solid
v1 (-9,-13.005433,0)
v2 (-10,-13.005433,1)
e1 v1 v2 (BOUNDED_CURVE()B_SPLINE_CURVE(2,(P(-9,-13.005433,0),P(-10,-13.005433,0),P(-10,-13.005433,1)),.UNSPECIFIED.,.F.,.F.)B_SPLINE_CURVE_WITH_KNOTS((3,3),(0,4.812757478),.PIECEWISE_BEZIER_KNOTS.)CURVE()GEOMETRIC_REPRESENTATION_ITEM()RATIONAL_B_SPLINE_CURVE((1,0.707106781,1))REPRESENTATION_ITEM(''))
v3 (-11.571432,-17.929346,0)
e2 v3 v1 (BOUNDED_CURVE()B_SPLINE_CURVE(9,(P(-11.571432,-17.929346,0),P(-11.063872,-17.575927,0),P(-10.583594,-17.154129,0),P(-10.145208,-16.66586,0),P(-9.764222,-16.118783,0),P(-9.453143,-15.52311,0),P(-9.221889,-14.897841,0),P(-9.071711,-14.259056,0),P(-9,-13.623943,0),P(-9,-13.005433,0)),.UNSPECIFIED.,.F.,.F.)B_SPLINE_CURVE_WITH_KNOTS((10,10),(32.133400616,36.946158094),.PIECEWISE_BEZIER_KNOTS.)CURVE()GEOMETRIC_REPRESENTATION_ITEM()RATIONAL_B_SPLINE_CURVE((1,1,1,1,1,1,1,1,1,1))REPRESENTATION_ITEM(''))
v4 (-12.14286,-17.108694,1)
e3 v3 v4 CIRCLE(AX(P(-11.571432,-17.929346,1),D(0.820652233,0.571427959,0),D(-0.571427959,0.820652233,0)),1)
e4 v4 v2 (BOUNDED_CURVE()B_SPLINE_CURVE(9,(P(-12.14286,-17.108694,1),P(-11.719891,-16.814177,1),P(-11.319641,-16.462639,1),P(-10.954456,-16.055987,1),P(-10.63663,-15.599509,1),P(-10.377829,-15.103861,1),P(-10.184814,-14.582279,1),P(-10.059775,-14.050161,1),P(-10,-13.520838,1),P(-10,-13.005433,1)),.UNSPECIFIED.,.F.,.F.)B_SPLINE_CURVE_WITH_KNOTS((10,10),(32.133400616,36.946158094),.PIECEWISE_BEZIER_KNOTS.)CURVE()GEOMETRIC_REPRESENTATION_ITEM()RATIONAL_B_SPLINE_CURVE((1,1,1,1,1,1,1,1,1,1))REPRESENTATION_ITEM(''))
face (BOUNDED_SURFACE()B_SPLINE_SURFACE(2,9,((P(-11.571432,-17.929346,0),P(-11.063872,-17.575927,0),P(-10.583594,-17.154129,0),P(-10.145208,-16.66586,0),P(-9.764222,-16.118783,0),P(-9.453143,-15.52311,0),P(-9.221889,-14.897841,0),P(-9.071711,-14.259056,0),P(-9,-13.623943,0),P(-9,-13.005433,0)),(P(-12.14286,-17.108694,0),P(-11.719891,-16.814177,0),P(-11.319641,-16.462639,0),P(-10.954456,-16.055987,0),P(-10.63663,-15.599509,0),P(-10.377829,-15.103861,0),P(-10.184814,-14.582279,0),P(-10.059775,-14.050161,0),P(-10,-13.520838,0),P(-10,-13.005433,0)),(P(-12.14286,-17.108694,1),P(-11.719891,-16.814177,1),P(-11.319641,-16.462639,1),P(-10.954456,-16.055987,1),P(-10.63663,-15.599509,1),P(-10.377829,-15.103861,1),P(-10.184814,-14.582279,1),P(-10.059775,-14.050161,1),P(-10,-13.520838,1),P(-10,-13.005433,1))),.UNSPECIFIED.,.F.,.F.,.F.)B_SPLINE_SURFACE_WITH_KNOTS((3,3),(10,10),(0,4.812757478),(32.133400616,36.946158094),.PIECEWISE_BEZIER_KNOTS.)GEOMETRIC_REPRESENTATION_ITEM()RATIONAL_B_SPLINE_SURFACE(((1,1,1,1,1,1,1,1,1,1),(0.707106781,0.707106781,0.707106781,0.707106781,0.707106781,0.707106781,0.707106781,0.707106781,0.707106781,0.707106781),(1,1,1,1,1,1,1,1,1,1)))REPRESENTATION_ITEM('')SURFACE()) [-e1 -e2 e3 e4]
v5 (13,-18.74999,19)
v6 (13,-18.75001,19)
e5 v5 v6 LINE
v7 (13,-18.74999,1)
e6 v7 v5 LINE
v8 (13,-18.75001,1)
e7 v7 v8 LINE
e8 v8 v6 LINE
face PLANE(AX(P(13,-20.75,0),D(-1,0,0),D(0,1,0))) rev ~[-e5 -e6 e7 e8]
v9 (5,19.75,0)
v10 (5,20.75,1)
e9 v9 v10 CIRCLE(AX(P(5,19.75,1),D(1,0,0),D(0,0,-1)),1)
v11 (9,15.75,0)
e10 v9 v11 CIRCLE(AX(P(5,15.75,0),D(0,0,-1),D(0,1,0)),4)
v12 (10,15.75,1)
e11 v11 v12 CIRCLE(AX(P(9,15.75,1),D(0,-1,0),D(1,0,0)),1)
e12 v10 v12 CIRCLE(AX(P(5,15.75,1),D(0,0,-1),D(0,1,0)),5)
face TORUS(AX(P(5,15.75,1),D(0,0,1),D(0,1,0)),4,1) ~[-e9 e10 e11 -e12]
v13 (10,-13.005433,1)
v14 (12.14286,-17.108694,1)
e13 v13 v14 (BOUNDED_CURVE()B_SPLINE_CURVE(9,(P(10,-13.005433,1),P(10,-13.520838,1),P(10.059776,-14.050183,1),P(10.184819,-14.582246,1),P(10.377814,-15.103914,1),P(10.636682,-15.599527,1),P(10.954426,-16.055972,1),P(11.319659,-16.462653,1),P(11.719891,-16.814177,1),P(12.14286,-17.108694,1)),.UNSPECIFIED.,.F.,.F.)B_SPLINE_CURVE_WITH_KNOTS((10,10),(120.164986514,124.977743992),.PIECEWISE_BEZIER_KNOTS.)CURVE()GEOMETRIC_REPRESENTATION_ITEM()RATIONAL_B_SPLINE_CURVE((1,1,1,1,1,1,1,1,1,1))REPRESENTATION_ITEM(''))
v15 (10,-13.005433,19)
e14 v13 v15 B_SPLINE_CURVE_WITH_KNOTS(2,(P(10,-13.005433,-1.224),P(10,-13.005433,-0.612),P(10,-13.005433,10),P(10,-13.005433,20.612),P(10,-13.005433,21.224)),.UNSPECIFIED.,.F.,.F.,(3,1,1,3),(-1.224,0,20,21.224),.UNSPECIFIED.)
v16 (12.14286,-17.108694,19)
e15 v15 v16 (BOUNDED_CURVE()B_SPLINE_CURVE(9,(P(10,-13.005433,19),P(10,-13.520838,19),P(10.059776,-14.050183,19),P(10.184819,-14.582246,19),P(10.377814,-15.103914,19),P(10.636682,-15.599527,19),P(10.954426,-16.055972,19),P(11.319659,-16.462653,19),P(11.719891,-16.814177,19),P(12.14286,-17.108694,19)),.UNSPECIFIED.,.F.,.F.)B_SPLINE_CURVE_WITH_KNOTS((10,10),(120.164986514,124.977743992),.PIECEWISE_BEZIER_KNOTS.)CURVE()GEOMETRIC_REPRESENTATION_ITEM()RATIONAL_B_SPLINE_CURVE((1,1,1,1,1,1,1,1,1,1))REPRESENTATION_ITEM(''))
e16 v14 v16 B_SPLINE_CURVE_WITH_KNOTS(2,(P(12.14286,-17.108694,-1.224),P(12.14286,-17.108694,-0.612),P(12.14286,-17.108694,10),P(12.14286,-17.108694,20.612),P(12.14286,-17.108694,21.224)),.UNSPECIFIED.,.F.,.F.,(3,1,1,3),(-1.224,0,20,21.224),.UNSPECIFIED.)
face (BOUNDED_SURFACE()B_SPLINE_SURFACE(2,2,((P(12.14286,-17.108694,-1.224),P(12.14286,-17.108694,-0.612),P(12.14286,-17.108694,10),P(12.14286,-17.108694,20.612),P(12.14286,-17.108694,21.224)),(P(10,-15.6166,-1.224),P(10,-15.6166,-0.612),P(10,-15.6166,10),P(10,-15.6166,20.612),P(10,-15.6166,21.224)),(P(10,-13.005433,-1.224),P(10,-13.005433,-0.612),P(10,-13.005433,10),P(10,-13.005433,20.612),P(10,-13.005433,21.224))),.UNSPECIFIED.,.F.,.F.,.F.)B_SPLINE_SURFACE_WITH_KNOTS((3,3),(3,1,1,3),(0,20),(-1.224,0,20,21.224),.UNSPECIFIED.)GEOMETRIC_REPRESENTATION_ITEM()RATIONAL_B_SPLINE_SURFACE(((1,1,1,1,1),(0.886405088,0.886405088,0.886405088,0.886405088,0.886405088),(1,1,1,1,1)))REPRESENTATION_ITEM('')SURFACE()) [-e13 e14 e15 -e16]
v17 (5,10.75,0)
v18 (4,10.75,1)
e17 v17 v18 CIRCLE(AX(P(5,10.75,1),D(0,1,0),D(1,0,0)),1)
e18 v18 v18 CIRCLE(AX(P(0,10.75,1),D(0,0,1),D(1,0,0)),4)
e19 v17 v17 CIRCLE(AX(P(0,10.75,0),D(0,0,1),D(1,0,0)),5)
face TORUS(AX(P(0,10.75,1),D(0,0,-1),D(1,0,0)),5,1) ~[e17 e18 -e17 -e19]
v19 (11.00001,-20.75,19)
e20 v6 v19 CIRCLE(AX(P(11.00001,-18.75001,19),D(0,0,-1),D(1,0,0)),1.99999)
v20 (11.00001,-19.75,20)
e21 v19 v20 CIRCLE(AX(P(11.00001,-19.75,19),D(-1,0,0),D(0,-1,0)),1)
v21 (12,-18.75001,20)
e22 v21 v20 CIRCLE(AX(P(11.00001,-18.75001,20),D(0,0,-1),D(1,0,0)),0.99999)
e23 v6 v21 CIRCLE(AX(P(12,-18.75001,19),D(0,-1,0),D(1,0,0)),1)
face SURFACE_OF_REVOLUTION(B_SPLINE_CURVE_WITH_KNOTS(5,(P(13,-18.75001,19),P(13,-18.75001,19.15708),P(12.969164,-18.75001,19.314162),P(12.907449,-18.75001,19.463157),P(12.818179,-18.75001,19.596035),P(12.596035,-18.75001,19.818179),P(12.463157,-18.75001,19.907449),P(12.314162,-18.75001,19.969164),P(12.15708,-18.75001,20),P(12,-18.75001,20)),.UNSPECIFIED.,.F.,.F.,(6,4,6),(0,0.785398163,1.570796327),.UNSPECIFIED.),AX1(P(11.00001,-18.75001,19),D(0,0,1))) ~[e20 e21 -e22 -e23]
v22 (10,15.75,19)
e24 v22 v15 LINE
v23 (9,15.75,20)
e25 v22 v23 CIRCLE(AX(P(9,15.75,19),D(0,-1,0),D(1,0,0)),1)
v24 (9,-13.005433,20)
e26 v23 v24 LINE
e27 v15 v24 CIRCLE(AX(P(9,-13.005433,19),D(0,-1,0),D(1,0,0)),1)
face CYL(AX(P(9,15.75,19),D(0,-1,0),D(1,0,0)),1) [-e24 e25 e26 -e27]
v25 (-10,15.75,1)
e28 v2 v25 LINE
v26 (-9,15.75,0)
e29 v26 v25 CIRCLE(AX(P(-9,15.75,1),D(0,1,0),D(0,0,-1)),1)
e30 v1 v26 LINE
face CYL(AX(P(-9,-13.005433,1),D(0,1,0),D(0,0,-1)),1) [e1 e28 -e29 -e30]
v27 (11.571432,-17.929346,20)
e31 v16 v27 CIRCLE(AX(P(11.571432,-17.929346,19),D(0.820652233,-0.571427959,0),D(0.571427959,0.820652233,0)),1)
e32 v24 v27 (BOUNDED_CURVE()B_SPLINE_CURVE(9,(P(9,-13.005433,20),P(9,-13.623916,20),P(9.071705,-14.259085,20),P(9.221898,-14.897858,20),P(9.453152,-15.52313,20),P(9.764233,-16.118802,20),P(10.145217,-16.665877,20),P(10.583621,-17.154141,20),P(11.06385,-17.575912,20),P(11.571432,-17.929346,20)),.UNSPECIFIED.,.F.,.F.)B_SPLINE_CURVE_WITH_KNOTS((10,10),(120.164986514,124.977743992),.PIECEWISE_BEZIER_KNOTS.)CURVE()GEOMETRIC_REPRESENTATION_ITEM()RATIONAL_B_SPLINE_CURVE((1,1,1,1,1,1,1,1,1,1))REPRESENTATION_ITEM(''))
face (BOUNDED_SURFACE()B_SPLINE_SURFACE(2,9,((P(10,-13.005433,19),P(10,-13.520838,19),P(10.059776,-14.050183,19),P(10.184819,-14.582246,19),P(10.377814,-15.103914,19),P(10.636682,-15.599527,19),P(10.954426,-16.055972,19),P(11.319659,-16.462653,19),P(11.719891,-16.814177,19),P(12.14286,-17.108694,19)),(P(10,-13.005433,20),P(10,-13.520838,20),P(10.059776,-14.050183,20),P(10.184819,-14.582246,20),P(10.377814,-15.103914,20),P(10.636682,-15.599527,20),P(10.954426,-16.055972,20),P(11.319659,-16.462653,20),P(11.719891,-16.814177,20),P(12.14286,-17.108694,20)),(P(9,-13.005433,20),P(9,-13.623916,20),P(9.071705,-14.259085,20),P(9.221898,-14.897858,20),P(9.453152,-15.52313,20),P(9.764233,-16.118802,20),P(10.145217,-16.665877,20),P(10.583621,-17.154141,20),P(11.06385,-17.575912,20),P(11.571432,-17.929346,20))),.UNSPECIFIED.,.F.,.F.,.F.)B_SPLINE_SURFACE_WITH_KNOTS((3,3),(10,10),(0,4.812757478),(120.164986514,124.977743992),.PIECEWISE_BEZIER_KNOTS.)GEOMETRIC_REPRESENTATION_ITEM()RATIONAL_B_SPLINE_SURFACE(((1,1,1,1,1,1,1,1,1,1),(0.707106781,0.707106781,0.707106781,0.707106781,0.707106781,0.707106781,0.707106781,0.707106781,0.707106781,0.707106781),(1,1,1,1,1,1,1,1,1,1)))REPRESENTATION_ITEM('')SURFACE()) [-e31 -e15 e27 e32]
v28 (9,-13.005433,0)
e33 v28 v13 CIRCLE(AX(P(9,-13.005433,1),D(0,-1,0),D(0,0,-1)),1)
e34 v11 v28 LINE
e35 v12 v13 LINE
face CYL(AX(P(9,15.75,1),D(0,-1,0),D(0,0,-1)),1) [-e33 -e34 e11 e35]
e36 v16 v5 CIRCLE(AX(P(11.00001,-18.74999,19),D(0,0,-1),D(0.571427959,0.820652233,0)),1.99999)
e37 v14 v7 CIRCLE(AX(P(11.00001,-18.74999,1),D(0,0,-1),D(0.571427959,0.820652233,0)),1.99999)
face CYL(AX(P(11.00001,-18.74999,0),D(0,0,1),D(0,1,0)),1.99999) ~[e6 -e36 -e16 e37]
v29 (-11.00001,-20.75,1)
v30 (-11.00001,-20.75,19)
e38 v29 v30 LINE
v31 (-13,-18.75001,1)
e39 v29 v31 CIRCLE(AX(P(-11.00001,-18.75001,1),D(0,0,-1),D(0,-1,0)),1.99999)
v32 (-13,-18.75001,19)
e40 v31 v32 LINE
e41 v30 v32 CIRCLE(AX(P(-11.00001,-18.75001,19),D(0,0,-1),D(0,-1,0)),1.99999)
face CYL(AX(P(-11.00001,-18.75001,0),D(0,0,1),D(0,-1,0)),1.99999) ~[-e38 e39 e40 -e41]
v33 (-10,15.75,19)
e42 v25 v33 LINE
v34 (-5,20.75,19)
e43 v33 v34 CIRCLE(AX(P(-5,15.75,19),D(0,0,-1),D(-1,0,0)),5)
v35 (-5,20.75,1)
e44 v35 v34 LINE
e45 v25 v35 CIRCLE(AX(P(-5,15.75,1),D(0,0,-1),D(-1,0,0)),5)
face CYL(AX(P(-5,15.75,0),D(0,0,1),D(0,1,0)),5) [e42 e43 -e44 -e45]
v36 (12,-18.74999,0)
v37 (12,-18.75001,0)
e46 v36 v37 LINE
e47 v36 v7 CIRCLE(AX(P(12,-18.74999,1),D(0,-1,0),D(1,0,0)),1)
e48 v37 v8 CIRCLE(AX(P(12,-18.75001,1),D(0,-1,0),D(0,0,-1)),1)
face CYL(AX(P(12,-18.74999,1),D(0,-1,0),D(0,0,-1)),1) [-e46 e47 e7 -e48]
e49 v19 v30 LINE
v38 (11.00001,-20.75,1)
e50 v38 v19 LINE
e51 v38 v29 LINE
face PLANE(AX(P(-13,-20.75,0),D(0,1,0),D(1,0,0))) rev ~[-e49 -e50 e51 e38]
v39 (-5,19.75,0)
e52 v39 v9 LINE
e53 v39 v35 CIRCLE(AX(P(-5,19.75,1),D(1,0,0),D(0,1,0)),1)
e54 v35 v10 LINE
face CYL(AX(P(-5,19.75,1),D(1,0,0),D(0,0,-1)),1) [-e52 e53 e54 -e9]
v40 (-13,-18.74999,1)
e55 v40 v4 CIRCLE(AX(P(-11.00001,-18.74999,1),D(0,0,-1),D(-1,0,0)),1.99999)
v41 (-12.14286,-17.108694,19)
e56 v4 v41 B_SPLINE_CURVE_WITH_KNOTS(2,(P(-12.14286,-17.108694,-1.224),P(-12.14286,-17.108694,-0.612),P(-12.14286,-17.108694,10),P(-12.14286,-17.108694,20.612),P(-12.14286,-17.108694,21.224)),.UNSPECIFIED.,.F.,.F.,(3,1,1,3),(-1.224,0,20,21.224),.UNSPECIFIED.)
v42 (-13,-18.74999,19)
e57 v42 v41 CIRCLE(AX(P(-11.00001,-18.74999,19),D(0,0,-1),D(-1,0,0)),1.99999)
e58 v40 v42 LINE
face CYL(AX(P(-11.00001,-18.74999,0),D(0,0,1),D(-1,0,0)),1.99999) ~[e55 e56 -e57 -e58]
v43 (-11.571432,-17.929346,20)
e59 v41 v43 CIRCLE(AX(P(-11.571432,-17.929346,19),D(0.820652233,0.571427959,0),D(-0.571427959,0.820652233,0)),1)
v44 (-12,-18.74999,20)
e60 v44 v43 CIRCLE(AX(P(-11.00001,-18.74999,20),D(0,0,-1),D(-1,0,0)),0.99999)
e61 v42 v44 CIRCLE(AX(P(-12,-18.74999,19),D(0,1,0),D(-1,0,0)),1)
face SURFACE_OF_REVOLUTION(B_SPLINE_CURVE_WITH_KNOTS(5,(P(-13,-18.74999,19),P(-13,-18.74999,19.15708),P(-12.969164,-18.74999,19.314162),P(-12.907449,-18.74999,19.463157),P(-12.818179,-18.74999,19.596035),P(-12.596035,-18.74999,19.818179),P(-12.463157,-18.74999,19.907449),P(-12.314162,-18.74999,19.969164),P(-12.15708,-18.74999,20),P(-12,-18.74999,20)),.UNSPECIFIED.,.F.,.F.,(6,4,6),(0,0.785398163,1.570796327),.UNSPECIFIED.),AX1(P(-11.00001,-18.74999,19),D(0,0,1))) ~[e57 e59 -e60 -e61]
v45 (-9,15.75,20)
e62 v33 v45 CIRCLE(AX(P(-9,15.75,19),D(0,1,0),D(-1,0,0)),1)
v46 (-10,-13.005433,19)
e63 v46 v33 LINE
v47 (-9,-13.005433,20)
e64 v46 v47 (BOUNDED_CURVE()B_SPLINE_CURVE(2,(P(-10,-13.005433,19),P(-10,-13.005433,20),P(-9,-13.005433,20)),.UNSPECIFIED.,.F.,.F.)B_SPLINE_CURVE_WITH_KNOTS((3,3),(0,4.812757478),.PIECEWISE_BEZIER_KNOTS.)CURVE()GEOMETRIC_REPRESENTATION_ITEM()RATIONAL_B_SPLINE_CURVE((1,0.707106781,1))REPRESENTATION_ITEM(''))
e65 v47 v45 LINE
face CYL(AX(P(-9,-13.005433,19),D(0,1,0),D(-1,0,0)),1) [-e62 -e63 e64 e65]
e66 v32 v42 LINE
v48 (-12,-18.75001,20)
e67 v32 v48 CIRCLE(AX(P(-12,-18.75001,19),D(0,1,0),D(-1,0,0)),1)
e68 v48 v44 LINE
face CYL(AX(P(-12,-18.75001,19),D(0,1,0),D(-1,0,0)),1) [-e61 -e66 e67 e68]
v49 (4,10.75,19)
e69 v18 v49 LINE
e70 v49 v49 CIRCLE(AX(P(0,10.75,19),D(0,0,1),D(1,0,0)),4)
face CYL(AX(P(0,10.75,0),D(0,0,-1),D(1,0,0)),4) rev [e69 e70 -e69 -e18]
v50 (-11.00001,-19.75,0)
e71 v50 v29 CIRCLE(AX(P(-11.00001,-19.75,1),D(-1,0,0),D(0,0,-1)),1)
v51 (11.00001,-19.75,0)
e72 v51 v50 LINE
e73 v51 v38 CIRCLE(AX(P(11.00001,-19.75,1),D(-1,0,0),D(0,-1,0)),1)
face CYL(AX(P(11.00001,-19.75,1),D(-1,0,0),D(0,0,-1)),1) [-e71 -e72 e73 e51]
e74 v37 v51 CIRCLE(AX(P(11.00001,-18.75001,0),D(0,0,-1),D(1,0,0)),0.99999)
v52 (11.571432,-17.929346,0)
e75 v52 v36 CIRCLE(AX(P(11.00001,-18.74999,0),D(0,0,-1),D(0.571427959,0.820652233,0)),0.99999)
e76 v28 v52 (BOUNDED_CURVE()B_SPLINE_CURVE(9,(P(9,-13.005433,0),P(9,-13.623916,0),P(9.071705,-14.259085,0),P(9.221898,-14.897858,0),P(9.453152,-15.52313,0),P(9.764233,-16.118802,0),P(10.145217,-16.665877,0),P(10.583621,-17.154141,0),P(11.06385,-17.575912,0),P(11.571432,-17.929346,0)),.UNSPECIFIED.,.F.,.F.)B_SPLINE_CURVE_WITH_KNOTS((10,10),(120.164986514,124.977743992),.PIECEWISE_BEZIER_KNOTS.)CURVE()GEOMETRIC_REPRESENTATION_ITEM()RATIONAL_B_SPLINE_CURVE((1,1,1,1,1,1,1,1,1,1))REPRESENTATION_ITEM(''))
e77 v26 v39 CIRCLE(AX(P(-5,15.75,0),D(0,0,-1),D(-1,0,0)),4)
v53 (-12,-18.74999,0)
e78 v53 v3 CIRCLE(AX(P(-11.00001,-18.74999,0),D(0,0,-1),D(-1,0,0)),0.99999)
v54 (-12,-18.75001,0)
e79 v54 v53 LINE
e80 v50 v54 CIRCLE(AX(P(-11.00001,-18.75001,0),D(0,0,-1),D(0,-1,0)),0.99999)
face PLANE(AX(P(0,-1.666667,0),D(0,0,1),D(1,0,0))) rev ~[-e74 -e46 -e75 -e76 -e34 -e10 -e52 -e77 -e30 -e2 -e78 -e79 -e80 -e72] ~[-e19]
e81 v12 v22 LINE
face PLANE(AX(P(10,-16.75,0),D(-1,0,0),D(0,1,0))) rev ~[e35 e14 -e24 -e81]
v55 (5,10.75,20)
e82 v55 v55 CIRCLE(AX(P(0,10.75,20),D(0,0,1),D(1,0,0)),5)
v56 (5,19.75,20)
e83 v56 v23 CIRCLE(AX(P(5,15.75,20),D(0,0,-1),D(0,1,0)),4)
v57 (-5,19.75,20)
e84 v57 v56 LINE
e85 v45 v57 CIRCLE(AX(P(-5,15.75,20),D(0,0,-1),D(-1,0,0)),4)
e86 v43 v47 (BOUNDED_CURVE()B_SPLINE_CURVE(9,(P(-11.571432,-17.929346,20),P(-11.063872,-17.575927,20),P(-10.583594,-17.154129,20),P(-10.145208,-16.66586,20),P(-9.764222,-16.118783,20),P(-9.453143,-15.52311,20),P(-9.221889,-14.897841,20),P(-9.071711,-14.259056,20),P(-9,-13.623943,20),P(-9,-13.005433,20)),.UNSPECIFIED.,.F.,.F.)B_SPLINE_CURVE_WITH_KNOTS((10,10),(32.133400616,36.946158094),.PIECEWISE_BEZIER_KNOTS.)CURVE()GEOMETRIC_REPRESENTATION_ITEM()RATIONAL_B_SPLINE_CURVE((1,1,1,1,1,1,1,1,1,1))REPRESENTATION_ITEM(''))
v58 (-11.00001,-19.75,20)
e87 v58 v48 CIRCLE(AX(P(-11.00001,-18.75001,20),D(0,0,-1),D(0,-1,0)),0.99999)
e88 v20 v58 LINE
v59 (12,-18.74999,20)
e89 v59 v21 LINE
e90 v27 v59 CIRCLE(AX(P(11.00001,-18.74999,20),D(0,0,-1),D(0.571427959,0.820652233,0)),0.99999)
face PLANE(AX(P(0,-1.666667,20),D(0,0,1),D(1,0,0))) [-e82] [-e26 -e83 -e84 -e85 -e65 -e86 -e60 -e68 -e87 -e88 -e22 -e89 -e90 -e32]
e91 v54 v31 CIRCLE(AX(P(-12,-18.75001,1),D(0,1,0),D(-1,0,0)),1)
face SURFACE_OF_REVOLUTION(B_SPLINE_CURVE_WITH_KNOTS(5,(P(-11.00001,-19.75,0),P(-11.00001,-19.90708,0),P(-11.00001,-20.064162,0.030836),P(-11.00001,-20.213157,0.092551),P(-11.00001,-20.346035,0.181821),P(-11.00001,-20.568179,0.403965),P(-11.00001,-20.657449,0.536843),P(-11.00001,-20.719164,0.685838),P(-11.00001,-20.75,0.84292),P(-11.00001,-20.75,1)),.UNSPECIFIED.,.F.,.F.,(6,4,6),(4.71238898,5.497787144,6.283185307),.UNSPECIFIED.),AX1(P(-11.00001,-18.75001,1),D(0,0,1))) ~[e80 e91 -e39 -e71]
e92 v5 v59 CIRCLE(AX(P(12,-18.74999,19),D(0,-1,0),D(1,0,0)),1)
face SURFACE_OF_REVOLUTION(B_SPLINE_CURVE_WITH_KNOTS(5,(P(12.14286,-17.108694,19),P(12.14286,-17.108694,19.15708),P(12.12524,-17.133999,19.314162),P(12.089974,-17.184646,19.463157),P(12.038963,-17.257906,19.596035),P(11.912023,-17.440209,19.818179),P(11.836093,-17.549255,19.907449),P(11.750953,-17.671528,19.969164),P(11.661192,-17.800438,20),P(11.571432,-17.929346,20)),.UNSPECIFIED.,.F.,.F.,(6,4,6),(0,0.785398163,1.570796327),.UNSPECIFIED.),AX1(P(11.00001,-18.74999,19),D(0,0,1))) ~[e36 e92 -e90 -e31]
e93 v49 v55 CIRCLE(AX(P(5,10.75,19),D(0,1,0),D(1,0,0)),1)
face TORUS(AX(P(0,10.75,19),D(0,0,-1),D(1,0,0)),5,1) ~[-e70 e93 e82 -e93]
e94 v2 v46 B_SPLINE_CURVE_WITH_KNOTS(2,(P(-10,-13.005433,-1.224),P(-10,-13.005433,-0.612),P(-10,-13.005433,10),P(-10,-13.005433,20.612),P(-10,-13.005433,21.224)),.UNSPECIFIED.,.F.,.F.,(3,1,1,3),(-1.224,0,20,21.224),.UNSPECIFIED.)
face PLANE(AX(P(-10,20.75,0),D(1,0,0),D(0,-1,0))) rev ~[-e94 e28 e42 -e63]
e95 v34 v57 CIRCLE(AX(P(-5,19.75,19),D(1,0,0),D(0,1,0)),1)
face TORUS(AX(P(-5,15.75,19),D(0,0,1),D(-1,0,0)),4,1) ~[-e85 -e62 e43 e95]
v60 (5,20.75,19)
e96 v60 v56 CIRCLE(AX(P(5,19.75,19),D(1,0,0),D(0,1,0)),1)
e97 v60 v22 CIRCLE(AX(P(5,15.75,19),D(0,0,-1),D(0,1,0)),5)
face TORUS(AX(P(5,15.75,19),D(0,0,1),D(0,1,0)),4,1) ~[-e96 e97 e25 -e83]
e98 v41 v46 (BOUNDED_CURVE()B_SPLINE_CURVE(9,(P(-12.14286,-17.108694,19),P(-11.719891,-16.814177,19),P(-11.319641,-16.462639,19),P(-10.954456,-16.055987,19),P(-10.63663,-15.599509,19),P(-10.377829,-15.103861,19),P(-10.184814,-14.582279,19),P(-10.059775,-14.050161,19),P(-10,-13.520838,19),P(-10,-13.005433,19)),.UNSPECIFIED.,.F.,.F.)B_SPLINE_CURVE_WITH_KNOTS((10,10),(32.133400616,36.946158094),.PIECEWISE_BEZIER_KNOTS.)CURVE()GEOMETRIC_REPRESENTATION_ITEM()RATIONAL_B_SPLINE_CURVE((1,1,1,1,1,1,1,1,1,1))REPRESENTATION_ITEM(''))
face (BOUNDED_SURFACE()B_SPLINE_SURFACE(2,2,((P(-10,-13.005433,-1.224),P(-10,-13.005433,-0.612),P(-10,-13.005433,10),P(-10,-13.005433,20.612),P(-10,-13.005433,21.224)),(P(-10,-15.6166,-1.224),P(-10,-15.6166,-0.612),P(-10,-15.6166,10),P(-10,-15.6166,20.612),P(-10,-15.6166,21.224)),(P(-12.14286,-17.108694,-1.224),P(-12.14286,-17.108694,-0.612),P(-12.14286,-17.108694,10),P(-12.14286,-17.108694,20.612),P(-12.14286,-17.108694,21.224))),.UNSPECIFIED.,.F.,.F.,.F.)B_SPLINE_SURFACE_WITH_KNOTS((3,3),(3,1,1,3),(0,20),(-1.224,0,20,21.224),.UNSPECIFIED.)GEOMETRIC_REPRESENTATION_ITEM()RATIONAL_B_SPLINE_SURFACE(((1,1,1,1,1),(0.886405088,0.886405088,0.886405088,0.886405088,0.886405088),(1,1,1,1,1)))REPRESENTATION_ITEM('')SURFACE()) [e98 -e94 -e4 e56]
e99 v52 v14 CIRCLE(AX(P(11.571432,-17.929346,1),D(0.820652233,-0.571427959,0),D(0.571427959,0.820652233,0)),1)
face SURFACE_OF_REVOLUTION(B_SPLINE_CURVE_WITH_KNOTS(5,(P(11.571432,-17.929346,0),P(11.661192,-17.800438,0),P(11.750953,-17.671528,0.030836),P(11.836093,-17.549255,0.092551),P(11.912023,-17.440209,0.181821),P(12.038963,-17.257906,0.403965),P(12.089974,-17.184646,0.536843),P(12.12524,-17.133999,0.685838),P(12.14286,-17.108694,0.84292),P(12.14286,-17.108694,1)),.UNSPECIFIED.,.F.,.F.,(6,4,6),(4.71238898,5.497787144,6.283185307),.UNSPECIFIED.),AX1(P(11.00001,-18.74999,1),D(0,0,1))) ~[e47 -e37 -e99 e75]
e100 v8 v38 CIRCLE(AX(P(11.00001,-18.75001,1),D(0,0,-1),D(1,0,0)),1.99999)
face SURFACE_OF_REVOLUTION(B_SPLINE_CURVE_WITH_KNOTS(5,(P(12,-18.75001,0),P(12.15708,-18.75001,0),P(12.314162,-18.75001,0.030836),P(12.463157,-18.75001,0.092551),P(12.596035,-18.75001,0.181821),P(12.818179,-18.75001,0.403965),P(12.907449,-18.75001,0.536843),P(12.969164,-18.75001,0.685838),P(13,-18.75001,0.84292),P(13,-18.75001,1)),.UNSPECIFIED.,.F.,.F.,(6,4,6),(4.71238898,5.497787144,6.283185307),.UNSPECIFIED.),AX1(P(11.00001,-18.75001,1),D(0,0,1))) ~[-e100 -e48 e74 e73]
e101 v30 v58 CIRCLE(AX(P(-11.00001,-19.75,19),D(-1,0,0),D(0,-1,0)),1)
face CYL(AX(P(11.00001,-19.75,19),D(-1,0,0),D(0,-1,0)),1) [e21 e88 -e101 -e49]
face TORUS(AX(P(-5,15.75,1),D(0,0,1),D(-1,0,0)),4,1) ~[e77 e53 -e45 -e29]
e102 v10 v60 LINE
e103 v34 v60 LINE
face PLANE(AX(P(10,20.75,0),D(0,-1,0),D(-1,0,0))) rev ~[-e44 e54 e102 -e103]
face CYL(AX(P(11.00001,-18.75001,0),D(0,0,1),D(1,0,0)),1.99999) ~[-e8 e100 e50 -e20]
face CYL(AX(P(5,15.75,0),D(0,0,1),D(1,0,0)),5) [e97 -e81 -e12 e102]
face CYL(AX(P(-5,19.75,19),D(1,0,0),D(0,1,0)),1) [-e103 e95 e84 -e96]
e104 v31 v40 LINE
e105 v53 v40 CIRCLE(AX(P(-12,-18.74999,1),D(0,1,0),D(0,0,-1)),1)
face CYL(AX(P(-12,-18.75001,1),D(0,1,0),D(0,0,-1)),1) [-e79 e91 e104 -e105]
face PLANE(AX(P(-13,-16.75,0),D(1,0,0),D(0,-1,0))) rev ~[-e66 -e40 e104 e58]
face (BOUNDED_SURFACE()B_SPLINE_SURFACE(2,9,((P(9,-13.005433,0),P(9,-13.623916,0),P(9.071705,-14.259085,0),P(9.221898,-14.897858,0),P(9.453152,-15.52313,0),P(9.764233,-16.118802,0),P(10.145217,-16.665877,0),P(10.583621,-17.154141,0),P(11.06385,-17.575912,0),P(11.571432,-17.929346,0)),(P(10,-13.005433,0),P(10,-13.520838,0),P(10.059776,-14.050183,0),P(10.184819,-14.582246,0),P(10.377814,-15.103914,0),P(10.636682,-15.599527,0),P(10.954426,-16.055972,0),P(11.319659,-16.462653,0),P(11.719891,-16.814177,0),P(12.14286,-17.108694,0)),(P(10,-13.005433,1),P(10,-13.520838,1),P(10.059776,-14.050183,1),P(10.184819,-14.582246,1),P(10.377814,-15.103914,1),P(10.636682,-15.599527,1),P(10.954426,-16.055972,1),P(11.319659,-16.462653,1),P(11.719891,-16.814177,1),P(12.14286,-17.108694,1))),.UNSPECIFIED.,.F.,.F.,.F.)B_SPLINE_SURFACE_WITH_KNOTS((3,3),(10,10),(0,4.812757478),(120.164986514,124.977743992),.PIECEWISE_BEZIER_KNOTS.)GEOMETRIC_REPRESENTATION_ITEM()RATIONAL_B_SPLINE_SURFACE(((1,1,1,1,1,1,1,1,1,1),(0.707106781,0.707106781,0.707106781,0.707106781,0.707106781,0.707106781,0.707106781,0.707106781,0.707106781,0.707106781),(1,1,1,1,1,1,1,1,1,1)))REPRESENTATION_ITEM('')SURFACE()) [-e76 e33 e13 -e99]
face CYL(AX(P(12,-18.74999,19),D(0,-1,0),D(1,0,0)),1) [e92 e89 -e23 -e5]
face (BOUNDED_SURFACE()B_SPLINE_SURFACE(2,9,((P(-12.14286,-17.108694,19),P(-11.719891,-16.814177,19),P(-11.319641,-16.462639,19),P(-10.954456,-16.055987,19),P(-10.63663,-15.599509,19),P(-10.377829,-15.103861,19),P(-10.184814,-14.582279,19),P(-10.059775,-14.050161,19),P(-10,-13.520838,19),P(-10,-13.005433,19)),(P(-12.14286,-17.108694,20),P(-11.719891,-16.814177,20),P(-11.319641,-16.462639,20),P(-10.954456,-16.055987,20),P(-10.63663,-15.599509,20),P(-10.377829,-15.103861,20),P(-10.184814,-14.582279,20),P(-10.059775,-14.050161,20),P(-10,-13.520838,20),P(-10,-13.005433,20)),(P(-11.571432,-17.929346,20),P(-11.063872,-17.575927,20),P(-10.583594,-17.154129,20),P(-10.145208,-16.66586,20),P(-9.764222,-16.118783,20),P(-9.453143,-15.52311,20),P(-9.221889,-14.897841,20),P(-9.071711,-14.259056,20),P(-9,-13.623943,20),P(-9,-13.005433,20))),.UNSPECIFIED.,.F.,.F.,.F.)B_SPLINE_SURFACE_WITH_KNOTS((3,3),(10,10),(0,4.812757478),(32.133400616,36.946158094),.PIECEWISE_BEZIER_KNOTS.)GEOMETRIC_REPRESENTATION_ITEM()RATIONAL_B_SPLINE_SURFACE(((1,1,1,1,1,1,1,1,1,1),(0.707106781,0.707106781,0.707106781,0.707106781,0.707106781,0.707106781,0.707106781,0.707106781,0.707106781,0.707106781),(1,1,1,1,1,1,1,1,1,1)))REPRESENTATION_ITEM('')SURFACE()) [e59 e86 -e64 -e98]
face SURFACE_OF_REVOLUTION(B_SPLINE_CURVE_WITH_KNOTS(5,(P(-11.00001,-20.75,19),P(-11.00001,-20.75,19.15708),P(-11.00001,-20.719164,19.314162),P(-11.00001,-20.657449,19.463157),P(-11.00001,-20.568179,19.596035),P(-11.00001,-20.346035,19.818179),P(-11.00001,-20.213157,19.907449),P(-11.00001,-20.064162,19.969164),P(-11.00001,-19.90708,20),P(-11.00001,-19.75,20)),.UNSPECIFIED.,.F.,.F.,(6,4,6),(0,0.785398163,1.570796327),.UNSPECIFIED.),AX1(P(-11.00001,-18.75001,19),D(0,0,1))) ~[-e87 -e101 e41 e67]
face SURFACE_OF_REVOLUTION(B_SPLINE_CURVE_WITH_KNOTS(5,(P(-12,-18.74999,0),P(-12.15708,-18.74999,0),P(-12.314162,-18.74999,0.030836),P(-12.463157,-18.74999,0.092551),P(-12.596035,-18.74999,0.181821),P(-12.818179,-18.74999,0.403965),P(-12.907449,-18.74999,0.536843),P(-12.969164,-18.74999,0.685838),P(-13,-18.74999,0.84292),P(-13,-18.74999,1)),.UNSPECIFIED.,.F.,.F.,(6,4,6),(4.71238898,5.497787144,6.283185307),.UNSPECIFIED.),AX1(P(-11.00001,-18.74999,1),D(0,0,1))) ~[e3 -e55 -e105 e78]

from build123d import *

# Parameters (mm, degrees)
F0_R     = 4
F1_DEPTH = 20
F2_R     = 5
F3_R     = 1.99999
F4_R     = 5
F5_R     = 1


# Not quite as in the source:
# - a fillet or chamfer is up to 0.001 mm smaller than in the source, because OpenCascade refuses the exact size


with BuildPart() as f1:
    # F0 (on Top) → F1 (new body)
    with BuildSketch(Plane.XY):
        Polygon((-10, -20.75), (10, -20.75), (13, -20.75), (13, -16.75), (10, -16.75), (10, 20.75), (-10, 20.75), (-10, -16.75), (-13, -16.75), (-13, -20.75), align=None)
        with Locations((0, 10.75)):
            Circle(F0_R, mode=Mode.SUBTRACT)
    extrude(amount=F1_DEPTH)

    # F2
    f2_edges = [f1.edges().sort_by_distance(p)[0] for p in [
        (-10, 20.75, 10),
        (10, 20.75, 10),
    ]]
    fillet(f2_edges, radius=F2_R)

    # F3 (radius 2 in the source; OpenCascade refuses exactly that, so slightly less here)
    f3_edges = [f1.edges().sort_by_distance(p)[0] for p in [
        (-13, -16.75, 10),
        (-13, -20.75, 10),
        (13, -16.75, 10),
        (13, -20.75, 10),
    ]]
    fillet(f3_edges, radius=F3_R)

    # F4
    f4_edges = [f1.edges().sort_by_distance(p)[0] for p in [
        (-10, -16.75, 10),
        (10, -16.75, 10),
    ]]
    fillet(f4_edges, radius=F4_R)

    # F5
    f5_edges = [f1.edges().sort_by_distance(p)[0] for p in [
        (12.772811, -17.824174, 20),
        (10.567975, -15.319984, 20),
        (13, -18.75, 20),
        (10, 1.372284, 20),
        (12.414216, -20.164216, 20),
        (8.535534, 19.285534, 20),
        (0, -20.75, 20),
        (0, 20.75, 20),
        (-12.414216, -20.164216, 20),
        (-8.535534, 19.285534, 20),
        (-13, -18.75, 20),
        (-10, 1.372284, 20),
        (-12.772811, -17.824174, 20),
        (-10.567975, -15.319984, 20),
        (-4, 10.75, 20),
        (12.772811, -17.824174, 0),
        (10.567975, -15.319984, 0),
        (13, -18.75, 0),
        (10, 1.372284, 0),
        (12.414216, -20.164216, 0),
        (8.535534, 19.285534, 0),
        (0, -20.75, 0),
        (0, 20.75, 0),
        (-12.414216, -20.164216, 0),
        (-8.535534, 19.285534, 0),
        (-13, -18.75, 0),
        (-10, 1.372284, 0),
        (-12.772811, -17.824174, 0),
        (-10.567975, -15.319984, 0),
        (-4, 10.75, 0),
    ]]
    fillet(f5_edges, radius=F5_R)


solid = f1.part
